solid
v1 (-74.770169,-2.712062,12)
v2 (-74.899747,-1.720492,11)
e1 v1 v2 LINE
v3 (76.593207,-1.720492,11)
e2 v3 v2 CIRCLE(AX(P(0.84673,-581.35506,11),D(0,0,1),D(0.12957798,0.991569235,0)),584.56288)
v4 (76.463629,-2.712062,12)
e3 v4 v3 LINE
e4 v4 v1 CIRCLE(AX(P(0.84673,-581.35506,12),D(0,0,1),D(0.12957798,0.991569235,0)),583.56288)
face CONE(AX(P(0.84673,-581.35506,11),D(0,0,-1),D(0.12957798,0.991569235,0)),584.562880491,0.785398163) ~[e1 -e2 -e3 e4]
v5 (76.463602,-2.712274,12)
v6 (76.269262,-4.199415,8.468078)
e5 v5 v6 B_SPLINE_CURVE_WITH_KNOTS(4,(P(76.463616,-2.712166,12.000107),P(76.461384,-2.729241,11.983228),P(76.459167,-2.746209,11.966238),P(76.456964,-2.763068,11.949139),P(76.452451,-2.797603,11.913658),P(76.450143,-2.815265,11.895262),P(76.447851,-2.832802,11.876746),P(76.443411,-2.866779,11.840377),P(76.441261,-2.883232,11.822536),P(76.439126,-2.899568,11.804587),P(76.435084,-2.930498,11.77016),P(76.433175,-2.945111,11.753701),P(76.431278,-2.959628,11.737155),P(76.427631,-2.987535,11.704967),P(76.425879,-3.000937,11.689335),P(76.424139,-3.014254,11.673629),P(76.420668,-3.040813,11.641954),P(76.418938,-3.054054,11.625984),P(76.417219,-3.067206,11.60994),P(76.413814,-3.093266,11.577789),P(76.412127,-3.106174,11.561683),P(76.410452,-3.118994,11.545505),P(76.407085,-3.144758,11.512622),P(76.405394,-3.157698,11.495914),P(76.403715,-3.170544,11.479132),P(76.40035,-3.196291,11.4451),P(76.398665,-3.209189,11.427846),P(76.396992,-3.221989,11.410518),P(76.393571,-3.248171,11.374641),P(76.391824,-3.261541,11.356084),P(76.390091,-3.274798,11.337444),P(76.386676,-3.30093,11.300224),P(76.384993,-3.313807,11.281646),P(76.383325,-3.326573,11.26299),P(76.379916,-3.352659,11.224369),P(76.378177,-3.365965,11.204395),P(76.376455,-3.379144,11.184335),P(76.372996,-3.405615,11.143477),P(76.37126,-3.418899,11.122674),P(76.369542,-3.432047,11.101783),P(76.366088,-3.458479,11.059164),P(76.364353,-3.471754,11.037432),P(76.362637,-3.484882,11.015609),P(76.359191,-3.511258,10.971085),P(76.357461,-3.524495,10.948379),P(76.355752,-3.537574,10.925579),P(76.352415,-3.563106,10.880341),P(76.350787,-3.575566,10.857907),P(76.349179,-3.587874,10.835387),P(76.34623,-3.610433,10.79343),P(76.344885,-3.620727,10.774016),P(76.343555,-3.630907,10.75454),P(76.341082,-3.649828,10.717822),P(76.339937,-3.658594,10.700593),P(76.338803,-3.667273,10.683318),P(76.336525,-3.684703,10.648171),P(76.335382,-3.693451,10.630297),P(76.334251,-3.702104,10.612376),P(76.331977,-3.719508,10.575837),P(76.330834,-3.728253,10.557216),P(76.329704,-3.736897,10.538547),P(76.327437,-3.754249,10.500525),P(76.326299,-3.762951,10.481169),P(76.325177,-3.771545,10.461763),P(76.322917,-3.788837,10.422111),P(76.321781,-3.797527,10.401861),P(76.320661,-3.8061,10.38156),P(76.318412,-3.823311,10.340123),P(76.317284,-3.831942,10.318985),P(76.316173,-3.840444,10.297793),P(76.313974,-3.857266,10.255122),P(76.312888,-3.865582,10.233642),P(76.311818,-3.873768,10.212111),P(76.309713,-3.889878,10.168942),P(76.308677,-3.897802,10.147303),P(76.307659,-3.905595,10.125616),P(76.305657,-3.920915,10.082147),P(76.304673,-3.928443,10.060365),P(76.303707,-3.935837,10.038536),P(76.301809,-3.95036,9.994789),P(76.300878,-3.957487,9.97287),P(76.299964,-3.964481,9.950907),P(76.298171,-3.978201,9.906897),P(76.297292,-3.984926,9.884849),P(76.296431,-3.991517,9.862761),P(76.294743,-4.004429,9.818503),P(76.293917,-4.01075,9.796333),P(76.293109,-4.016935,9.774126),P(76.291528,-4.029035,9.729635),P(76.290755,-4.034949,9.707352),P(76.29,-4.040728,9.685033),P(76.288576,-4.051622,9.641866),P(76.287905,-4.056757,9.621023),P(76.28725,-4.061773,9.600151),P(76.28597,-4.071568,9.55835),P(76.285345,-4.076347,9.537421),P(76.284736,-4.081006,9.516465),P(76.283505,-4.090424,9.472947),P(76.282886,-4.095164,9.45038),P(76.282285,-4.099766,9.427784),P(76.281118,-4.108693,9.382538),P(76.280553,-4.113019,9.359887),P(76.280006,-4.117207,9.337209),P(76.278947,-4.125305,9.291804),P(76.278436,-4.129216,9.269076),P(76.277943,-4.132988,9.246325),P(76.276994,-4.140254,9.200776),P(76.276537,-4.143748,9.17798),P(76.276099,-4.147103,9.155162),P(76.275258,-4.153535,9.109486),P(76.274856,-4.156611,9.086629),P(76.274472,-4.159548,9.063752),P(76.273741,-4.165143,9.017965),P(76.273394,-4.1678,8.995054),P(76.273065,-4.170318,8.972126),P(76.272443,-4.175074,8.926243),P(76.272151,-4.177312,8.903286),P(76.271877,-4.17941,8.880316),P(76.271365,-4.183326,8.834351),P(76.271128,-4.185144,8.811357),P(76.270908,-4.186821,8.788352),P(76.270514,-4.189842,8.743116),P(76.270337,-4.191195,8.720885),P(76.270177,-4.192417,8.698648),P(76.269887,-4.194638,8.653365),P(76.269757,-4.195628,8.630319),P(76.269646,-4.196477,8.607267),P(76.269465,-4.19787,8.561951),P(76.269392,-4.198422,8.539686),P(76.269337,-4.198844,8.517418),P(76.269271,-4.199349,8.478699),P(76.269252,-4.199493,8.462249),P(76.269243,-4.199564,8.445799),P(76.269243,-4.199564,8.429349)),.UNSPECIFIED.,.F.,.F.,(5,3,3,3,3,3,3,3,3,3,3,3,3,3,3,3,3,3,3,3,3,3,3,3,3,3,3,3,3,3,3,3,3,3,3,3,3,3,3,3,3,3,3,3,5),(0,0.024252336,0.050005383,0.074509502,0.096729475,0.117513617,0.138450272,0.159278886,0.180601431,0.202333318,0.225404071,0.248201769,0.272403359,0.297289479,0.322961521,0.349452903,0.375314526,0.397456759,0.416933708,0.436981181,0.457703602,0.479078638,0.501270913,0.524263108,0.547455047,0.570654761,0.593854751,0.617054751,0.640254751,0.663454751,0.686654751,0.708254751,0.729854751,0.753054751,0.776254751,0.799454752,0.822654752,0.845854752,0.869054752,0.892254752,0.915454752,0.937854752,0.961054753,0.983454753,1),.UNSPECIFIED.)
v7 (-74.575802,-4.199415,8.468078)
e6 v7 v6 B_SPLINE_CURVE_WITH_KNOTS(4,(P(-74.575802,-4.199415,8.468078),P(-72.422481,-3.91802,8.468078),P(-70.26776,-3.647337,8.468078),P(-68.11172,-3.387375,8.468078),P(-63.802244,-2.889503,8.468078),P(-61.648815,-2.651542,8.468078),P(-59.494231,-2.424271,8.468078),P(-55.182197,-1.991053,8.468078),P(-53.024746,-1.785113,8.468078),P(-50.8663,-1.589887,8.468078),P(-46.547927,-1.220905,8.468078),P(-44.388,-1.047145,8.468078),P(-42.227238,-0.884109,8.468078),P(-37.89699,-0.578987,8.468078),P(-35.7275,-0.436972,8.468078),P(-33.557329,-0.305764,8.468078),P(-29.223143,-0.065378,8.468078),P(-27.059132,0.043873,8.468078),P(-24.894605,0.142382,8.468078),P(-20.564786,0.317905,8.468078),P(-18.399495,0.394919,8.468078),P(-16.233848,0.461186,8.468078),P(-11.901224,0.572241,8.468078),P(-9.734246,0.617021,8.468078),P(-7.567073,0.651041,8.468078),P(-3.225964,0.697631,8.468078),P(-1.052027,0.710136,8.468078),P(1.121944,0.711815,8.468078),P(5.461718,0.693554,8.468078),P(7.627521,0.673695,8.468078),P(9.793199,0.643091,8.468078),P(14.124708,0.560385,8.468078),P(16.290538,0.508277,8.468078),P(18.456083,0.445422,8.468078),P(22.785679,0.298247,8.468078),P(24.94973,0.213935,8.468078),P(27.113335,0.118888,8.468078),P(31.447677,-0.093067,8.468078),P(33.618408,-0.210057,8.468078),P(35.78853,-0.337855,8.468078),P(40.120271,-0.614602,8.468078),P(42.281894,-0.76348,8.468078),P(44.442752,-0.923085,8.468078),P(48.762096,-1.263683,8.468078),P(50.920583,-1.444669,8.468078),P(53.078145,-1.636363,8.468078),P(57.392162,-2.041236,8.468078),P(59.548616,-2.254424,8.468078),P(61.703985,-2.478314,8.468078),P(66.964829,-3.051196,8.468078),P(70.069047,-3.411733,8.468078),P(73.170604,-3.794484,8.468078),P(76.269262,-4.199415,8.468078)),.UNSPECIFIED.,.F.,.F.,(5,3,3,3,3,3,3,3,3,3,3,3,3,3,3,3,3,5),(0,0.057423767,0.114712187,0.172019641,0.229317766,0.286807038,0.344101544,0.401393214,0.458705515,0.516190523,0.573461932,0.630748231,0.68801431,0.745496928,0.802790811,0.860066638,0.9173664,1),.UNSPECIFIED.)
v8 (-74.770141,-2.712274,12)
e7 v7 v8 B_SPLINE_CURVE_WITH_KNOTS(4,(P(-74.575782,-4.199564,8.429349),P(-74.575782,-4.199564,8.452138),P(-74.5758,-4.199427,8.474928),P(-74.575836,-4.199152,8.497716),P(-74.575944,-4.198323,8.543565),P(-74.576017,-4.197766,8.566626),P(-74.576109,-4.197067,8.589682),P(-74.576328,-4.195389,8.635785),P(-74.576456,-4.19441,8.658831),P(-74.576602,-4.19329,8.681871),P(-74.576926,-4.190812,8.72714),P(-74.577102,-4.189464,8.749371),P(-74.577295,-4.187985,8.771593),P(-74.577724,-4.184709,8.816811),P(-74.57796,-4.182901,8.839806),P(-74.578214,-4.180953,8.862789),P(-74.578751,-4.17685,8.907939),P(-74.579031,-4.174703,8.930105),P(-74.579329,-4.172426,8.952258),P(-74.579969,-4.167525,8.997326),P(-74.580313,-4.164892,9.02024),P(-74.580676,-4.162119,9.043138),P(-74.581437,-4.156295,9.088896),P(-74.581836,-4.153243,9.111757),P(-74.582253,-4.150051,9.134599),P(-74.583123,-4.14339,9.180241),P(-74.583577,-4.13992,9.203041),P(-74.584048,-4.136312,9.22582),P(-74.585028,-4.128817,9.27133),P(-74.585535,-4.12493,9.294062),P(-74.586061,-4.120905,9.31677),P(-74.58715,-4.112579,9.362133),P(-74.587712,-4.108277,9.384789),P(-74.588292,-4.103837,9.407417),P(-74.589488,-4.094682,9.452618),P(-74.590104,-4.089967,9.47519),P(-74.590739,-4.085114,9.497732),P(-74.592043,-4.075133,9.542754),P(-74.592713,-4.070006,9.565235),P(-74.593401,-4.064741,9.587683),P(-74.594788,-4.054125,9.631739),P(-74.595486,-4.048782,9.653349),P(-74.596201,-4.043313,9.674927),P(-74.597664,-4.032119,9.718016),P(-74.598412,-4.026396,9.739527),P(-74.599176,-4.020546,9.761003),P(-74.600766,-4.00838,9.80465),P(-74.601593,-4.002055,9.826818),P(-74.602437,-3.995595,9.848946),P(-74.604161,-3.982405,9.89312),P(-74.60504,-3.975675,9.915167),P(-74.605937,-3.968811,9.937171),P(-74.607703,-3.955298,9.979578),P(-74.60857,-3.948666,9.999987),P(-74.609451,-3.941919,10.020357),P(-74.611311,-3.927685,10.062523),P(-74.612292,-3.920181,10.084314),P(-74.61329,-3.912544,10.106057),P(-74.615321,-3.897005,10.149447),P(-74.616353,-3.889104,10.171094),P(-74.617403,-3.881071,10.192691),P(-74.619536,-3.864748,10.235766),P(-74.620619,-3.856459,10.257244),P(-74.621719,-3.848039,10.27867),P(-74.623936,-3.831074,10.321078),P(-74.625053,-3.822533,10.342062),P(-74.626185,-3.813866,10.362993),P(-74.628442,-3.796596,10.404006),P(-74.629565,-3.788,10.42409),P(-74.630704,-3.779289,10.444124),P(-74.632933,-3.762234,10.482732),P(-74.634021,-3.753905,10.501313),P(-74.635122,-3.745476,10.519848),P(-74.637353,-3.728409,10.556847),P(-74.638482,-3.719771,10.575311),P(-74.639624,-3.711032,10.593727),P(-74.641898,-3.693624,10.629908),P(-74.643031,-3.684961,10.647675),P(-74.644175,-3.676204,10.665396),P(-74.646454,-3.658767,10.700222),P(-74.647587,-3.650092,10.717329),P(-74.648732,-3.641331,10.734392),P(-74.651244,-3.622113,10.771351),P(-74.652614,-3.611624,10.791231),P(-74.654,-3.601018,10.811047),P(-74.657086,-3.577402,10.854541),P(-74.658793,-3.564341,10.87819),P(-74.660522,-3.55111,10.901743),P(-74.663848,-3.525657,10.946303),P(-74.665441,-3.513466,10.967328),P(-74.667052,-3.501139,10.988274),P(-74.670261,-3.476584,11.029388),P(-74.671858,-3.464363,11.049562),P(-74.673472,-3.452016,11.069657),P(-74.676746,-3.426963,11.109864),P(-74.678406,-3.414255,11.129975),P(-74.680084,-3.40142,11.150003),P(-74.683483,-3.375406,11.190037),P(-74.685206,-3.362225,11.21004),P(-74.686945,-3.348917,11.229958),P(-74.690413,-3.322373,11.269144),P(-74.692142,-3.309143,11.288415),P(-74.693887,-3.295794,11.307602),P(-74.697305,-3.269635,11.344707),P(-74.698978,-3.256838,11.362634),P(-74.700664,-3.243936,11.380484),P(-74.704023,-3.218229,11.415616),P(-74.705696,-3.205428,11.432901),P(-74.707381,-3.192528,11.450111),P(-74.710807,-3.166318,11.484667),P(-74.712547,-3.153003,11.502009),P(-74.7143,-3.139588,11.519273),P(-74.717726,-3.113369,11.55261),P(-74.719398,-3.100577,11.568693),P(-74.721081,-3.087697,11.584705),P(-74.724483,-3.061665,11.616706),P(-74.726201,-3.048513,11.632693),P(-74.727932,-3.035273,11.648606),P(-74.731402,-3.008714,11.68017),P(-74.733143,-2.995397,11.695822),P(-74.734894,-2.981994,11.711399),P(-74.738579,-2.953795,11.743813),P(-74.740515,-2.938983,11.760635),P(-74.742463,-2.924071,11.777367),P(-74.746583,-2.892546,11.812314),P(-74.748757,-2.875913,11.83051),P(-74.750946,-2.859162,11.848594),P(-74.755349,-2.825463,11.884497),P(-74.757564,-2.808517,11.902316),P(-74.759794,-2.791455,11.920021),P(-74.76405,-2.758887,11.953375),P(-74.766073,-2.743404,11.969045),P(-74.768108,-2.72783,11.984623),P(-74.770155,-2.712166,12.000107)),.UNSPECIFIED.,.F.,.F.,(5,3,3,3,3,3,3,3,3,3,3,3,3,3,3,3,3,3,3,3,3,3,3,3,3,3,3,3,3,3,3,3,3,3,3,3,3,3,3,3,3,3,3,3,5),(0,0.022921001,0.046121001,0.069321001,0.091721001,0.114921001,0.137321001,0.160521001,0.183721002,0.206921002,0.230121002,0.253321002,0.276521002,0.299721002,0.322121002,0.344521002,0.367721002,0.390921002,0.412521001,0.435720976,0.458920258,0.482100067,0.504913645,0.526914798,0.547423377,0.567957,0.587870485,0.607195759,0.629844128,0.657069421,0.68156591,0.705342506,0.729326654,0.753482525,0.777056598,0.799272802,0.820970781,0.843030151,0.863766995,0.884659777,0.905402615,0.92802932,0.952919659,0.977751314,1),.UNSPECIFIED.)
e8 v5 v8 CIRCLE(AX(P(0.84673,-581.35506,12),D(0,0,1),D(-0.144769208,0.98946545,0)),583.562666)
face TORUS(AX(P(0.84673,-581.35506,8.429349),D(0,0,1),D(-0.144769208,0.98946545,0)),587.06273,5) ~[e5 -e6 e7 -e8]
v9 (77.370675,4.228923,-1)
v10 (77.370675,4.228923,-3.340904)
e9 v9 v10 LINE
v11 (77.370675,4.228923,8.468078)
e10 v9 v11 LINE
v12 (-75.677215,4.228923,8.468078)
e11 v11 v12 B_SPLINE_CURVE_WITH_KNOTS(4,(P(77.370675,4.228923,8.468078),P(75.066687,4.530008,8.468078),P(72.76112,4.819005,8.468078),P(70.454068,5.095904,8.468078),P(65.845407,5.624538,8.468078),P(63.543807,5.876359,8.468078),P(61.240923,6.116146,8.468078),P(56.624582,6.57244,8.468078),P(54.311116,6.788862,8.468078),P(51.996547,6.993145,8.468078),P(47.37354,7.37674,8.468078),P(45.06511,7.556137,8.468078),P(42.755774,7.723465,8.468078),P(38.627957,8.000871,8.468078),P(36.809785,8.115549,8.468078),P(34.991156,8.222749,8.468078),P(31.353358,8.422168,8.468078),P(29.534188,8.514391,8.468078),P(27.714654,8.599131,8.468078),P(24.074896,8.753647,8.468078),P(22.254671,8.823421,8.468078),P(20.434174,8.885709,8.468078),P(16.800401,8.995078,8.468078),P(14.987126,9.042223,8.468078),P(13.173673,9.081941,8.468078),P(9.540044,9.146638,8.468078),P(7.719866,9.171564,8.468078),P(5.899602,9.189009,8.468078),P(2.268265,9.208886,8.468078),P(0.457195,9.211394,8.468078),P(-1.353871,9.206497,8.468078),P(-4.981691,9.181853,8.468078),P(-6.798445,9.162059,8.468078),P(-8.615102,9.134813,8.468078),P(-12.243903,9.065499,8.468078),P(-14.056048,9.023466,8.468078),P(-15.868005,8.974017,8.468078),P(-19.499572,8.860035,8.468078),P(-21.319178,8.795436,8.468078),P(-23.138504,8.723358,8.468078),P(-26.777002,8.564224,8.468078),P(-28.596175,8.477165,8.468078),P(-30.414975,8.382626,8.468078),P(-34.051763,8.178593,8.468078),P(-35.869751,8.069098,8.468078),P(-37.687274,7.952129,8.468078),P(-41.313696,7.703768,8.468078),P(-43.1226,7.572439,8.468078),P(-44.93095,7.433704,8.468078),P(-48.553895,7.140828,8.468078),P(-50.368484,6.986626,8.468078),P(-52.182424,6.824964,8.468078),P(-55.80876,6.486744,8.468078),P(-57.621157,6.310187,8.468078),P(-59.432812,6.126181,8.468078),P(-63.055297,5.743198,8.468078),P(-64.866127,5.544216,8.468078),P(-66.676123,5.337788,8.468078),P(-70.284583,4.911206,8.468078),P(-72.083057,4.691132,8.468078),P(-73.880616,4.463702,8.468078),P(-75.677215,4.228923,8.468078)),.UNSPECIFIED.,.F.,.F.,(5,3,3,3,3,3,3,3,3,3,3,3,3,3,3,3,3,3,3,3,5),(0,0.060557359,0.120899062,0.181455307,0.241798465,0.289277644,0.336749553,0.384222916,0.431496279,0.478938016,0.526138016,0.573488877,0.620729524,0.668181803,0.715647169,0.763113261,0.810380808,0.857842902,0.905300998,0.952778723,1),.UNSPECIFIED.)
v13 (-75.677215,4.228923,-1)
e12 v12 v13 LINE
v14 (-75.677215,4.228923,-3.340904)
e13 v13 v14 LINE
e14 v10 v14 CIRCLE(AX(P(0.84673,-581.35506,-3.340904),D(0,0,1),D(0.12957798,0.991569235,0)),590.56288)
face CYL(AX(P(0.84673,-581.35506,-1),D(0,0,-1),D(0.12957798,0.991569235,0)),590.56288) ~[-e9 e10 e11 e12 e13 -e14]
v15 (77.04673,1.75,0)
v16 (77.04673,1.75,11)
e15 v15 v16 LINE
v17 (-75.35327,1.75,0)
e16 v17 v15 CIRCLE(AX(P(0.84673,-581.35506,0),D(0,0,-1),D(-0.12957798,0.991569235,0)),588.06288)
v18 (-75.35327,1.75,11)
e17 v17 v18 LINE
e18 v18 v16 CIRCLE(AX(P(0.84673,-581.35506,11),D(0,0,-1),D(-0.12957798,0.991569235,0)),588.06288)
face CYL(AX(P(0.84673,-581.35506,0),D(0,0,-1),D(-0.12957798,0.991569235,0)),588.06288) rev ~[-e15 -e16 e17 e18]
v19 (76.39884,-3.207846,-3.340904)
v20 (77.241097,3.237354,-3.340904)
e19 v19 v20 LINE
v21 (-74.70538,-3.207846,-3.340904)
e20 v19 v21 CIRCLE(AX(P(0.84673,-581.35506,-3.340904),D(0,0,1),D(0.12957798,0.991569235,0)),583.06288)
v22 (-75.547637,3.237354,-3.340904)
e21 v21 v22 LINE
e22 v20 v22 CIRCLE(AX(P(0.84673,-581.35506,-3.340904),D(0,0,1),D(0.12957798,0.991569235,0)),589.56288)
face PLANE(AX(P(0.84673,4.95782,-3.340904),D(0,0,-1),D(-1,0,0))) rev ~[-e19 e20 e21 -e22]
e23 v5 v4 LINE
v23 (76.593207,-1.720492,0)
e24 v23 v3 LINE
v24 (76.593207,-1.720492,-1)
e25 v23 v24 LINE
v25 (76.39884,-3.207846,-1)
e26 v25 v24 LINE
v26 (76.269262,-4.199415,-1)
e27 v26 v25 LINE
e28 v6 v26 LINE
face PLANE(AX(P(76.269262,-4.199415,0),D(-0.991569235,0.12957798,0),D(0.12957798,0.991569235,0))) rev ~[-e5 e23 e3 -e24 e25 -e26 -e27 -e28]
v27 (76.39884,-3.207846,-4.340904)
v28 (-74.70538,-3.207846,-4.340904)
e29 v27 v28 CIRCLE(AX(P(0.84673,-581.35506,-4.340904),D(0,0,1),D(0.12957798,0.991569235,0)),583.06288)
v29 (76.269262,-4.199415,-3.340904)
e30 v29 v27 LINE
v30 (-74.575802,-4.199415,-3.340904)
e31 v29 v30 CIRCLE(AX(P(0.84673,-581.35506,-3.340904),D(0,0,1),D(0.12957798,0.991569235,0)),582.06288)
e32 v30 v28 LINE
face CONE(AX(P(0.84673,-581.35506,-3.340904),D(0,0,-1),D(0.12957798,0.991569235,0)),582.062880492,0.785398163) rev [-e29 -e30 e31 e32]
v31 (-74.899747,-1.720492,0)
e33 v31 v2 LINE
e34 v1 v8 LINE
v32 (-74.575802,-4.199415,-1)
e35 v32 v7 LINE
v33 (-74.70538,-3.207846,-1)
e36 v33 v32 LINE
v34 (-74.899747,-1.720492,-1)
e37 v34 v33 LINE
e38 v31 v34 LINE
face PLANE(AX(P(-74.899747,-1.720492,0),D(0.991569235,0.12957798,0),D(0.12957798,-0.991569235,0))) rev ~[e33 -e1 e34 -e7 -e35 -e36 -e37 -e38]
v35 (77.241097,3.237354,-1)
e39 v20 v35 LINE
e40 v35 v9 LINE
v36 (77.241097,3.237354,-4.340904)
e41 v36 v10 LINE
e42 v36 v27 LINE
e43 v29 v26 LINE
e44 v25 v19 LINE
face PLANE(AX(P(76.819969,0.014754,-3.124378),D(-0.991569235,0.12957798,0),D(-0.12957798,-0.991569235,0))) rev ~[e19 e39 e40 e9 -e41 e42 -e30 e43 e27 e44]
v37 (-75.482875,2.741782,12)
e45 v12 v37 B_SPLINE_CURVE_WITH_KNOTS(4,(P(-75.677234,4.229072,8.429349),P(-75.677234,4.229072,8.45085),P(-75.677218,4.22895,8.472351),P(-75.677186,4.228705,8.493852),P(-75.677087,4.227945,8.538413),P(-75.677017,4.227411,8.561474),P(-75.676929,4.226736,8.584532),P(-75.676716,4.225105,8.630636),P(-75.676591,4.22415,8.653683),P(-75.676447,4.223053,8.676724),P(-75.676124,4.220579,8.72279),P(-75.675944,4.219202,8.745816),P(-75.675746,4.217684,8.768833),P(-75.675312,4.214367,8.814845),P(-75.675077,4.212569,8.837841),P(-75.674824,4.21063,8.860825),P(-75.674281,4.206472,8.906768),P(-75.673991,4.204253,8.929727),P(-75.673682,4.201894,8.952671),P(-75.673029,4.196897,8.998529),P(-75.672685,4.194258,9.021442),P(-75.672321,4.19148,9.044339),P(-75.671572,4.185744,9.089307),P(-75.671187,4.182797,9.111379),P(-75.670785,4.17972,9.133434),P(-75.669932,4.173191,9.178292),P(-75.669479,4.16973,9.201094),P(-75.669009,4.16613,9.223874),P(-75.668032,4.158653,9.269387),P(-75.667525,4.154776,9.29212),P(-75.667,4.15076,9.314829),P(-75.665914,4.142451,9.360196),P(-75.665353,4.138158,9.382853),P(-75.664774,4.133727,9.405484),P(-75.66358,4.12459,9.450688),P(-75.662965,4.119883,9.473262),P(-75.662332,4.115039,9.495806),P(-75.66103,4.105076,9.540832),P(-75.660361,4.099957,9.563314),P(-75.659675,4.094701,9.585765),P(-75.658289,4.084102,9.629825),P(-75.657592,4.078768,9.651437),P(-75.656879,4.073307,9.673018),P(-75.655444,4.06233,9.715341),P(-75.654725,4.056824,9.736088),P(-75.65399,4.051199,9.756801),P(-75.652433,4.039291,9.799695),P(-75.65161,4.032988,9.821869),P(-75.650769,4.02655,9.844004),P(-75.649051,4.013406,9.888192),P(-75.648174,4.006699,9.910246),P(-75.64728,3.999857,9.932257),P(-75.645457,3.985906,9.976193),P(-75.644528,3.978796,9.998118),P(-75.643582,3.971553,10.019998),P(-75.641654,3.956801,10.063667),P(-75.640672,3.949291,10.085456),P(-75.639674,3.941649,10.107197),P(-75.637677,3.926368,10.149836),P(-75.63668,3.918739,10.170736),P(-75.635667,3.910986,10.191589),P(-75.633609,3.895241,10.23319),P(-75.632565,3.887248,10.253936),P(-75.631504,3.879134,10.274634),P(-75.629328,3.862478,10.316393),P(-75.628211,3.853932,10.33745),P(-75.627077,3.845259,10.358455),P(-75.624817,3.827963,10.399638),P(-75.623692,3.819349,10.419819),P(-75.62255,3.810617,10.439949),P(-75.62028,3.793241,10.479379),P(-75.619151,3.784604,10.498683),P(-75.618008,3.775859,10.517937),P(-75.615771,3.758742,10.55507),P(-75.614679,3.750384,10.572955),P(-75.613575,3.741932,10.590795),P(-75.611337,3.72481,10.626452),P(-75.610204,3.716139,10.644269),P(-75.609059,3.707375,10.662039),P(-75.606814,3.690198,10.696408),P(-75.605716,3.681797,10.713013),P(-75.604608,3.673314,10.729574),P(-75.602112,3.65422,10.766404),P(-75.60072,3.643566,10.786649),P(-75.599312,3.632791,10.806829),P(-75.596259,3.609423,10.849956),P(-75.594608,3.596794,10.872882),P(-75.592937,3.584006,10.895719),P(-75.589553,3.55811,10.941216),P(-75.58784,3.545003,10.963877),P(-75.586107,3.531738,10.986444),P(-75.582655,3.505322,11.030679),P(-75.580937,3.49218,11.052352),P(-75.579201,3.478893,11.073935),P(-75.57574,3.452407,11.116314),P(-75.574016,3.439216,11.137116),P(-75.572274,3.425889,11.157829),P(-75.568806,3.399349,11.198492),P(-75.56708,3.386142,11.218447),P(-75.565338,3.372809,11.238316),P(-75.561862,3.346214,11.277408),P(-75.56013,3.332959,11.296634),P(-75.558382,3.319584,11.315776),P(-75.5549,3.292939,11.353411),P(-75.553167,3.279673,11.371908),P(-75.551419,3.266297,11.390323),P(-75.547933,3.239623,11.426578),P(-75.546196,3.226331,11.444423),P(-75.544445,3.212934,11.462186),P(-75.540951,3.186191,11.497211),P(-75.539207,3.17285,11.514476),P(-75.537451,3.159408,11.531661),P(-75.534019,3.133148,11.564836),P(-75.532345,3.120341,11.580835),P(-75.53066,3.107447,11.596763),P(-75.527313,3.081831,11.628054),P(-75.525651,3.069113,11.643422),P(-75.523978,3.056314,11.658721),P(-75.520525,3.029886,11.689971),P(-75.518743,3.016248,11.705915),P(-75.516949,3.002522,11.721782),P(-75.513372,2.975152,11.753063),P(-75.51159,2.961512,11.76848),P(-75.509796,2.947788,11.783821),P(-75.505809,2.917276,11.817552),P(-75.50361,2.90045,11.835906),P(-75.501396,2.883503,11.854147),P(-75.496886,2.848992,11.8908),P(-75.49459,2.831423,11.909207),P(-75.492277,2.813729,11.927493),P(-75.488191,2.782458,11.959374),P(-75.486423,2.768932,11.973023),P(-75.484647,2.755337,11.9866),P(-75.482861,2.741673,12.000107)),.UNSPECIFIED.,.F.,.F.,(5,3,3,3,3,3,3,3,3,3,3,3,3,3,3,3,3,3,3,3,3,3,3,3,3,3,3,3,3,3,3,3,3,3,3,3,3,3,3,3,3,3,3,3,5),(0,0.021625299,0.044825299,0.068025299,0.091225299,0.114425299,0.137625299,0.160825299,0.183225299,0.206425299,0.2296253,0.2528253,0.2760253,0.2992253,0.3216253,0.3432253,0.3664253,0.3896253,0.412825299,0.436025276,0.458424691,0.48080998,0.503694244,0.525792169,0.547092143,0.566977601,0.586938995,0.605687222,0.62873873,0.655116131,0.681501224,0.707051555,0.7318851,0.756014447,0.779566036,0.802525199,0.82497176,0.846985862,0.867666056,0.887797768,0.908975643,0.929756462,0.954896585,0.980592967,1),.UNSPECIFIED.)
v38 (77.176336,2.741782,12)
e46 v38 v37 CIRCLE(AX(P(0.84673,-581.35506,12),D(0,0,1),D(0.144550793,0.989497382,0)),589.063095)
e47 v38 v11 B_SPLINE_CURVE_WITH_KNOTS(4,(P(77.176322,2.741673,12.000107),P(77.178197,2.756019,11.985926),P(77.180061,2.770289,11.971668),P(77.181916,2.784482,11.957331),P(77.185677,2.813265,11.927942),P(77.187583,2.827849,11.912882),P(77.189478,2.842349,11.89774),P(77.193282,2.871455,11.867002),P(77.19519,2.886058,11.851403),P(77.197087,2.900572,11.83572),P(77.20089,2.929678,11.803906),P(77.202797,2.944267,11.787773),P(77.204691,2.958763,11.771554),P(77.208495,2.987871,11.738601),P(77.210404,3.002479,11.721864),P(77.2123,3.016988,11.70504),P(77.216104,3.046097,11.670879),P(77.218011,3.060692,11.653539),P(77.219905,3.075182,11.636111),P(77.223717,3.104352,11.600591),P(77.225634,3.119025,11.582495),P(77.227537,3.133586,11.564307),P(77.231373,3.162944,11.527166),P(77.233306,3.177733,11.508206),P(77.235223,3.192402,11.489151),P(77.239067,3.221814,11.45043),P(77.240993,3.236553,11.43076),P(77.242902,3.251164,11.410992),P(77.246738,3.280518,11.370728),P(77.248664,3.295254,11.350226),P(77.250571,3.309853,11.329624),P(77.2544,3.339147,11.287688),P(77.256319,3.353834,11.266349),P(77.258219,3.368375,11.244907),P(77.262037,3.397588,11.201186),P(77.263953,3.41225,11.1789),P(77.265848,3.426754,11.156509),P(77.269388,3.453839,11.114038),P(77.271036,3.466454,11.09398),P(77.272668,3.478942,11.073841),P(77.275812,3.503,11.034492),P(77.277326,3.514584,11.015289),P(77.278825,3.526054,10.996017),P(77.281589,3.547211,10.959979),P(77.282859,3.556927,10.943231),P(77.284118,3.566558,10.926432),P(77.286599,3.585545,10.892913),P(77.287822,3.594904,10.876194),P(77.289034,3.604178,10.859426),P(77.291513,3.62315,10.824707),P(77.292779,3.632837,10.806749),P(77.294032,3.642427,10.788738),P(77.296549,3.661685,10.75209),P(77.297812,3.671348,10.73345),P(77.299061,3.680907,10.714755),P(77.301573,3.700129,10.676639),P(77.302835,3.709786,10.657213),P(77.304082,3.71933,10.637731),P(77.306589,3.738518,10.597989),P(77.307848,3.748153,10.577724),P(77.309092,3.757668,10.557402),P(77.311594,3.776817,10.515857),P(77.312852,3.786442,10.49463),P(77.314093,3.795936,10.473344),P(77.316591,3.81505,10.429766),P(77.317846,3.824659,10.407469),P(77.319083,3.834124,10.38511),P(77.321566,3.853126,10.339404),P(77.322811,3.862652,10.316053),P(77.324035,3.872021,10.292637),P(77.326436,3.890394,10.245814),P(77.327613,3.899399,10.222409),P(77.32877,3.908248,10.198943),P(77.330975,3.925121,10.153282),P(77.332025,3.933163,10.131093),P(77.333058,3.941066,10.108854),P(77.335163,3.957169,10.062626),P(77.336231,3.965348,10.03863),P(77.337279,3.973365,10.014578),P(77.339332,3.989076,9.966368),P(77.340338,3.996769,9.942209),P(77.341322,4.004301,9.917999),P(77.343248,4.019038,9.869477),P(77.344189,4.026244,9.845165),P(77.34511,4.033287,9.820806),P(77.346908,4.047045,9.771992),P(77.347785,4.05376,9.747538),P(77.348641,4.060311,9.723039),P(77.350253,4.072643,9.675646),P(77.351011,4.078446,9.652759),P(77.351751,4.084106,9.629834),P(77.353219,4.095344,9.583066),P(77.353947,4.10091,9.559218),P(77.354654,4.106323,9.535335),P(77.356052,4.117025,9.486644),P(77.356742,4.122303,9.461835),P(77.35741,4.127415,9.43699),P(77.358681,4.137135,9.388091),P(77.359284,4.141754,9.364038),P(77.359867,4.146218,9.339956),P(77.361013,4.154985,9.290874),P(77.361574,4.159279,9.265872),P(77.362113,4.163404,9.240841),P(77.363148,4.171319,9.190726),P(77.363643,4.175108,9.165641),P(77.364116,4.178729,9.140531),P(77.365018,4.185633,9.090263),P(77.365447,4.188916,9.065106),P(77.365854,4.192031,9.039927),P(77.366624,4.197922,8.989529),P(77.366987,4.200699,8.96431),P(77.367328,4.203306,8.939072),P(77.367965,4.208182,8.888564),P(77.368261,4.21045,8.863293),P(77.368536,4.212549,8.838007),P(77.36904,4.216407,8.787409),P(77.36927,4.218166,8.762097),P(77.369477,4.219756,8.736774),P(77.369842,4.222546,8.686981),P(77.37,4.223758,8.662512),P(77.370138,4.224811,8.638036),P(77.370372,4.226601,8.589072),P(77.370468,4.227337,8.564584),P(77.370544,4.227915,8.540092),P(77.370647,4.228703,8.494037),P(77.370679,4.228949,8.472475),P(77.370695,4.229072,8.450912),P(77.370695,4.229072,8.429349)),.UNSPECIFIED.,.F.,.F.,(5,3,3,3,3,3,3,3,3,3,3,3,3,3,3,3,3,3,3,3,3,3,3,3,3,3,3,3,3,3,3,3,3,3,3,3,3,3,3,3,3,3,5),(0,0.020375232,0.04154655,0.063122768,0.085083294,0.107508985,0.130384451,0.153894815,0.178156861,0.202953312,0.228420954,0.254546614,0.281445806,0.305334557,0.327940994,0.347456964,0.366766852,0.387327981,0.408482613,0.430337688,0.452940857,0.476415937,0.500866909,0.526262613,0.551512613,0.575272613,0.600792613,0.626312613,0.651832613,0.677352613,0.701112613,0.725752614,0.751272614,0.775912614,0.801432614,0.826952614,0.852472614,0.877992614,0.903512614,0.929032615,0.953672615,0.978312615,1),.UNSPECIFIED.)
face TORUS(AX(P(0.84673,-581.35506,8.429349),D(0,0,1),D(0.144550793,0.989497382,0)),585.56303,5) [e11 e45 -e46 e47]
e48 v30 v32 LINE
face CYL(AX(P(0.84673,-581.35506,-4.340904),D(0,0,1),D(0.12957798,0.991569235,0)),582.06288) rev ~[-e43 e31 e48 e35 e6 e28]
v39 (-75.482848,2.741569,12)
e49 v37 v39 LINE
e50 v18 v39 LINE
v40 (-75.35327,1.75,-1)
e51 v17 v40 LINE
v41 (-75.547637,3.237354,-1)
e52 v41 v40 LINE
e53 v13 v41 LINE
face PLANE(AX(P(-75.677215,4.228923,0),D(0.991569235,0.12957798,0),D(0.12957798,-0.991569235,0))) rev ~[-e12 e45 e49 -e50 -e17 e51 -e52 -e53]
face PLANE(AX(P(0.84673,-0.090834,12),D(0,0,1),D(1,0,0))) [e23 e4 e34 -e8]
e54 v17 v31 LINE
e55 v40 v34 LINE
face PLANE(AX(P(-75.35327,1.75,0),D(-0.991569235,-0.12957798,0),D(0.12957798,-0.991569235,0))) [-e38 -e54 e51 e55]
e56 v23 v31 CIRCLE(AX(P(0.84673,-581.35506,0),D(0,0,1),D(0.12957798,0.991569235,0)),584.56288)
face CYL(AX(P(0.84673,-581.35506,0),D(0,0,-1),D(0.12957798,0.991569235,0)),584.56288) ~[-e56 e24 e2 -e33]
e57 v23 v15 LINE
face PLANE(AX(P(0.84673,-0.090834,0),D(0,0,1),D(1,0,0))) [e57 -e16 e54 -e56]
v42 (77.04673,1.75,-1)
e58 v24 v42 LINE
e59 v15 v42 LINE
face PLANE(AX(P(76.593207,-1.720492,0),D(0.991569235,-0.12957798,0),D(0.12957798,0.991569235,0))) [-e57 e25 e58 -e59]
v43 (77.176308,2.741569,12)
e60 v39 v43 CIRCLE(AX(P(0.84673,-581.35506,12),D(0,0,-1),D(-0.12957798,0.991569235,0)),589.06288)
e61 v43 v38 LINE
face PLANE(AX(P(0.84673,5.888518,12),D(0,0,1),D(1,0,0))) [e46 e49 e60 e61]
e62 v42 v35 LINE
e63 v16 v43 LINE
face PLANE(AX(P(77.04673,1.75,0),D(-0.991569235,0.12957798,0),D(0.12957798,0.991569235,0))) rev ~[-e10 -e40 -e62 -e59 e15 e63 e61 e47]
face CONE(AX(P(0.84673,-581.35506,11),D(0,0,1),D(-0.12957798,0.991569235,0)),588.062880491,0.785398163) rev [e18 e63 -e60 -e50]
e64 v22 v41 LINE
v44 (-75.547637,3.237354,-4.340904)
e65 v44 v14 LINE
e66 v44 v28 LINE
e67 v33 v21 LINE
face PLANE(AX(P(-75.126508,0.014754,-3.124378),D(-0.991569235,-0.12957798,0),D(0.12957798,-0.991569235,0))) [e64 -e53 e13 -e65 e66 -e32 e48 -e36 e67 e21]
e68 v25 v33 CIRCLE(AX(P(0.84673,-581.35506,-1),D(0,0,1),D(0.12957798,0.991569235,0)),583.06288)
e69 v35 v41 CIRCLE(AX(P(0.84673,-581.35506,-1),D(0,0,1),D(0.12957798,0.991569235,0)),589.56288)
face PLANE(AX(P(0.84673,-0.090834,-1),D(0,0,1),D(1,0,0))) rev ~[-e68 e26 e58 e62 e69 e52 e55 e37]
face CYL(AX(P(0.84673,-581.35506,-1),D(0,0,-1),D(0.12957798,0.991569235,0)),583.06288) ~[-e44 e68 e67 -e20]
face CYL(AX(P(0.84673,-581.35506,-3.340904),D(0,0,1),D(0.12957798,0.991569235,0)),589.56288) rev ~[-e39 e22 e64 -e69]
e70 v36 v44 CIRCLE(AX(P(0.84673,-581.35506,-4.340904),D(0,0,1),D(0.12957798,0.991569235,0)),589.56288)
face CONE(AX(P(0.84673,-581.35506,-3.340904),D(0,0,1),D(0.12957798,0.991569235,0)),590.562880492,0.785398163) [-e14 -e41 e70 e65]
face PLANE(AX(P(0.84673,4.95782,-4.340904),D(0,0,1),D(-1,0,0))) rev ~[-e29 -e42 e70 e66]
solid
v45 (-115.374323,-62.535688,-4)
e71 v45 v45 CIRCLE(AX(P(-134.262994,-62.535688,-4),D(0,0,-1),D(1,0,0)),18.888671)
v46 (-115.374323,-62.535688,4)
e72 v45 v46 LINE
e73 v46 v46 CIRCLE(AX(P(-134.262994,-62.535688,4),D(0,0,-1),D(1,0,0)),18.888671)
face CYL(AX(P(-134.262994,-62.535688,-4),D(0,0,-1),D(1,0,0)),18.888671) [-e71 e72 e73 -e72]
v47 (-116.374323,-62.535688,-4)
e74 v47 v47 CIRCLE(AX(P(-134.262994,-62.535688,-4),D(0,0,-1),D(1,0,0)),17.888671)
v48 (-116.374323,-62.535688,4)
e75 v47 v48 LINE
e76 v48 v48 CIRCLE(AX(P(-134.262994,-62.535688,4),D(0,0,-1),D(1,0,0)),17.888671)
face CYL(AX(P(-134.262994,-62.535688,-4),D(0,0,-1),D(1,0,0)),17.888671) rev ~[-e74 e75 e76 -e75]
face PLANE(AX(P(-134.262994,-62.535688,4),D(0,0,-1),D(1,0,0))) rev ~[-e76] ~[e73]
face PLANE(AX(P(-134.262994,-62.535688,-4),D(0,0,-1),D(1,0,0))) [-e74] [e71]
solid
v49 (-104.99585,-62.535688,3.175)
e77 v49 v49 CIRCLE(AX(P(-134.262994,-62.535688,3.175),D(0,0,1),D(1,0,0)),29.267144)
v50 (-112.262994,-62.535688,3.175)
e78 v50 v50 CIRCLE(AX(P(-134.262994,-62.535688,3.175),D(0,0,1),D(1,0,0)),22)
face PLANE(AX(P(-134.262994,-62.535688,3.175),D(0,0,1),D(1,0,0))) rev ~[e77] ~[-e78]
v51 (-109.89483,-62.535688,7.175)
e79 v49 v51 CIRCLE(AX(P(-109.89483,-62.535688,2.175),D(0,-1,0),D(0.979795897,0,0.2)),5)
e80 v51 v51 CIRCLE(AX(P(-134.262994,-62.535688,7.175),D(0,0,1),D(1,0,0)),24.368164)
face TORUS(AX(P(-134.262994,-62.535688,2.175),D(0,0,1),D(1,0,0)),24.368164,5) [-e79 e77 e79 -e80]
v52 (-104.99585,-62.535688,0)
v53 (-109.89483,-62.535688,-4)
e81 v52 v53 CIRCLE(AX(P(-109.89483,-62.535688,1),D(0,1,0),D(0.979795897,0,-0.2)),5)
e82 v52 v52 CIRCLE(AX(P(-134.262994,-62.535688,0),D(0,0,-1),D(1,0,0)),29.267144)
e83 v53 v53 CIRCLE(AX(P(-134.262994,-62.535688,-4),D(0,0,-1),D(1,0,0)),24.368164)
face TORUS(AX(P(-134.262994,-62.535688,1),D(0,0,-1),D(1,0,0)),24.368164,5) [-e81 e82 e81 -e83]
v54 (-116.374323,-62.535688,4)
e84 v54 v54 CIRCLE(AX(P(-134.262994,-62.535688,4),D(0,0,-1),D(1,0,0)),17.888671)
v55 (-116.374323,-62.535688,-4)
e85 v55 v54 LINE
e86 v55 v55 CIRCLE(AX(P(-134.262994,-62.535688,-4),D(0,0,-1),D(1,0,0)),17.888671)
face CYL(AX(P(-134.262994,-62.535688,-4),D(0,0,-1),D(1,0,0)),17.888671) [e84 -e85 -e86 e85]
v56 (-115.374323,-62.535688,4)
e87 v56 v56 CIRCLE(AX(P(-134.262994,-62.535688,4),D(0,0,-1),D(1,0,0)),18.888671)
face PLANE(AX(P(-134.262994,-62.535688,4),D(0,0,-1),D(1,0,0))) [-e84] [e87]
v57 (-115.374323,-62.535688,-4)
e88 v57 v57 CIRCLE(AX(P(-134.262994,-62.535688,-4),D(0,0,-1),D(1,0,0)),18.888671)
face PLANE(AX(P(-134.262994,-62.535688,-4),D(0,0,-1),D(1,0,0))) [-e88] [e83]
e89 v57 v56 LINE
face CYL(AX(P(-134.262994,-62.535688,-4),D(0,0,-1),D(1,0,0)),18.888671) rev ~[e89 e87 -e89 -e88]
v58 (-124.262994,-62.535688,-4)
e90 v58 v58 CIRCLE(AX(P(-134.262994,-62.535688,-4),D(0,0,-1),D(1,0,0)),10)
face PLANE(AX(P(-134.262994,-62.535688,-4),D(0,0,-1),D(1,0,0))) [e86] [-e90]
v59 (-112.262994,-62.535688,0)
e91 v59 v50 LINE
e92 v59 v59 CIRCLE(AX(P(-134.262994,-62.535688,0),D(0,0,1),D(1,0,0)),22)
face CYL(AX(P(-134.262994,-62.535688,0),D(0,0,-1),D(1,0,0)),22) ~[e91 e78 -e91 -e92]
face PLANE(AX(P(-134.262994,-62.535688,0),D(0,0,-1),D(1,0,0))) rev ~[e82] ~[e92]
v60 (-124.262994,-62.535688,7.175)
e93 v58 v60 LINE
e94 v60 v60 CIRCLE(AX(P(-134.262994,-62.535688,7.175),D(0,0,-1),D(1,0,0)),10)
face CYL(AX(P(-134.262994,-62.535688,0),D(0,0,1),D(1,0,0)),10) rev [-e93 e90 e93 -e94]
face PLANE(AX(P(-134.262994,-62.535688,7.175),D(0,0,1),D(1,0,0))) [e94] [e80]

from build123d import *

# Parameters (mm, degrees)
F1_DEPTH    = 1
F4_DEPTH    = 1
F6_DEPTH    = 12
F7_SIZE     = 1
F8_T2_ANGLE = 16.6478295889
F8_T4_ANGLE = 16.6225349948
F11_SIZE    = 1
F12_R       = 22
F12_R_2     = 10
F13_DEPTH   = 3.175
F14_R       = 29.2671438264
F15_DEPTH   = 4
F17_DEPTH   = 25
F18_R       = 29.2671438264
F18_R_2     = 10
F19_DEPTH   = 4
F21_R       = 18.8886705246
F21_R_2     = 17.8886705246
F22_DEPTH   = 8


# Not quite as in the source:
# - a fillet or chamfer that OpenCascade refuses, or shapes differently, is made with other operations: its cross-section is extruded or revolved along the edge and cut away or added


with BuildPart() as f1:
    # F0 (on Top) → F1 (new body)
    with BuildSketch(Plane.XY):
        Polygon((76.2, -1.75), (76.2, 1.75), (76.2, 6.1025535688), (-76.2, 6.1025535688), (-76.2, 1.75), (-76.2, -1.75), (-76.2, -6.1025535688), (76.2, -6.1025535688), align=None)
    extrude(amount=-F1_DEPTH)


with BuildPart() as f4:
    # F3 (on Top) → F4 (new body)
    with BuildSketch(Plane.XY):
        with BuildLine():
            Line((76.2692624922, -4.1994154081), (76.5932074415, -1.7204923214))
            ThreePointArc((76.5932074415, -1.7204923214), (0.8467303705, 3.2078201362), (-74.8997467005, -1.7204923214))
            Line((-74.8997467005, -1.7204923214), (-74.5758017512, -4.1994154081))
            ThreePointArc((-74.5758017512, -4.1994154081), (0.8467303705, 0.7078201362), (76.2692624922, -4.1994154081))
        make_face()
        with BuildLine():
            Line((76.5932074415, -1.7204923214), (77.0467303705, 1.75))
            ThreePointArc((77.0467303705, 1.75), (0.8467303705, 6.7078201362), (-75.3532696295, 1.75))
            Line((-75.3532696295, 1.75), (-74.8997467005, -1.7204923214))
            ThreePointArc((-74.8997467005, -1.7204923214), (0.8467303705, 3.2078201362), (76.5932074415, -1.7204923214))
        make_face()
        with BuildLine():
            ThreePointArc((-75.3532696295, 1.75), (0.8467303705, 6.7078201362), (77.0467303705, 1.75))
            Line((77.0467303705, 1.75), (77.3706753198, 4.2289230867))
            ThreePointArc((77.3706753198, 4.2289230867), (0.8467303705, 9.2078201362), (-75.6772145787, 4.2289230867))
            Line((-75.6772145787, 4.2289230867), (-75.3532696295, 1.75))
        make_face()
    extrude(amount=-F4_DEPTH)

    # F5 (on face) → F6 (join)
    with BuildSketch(Plane.XY):
        with BuildLine():
            ThreePointArc((-75.3532696295, 1.75), (0.8467303705, 6.7078201362), (77.0467303705, 1.75))
            Line((77.0467303705, 1.75), (77.3706753198, 4.2289230867))
            ThreePointArc((77.3706753198, 4.2289230867), (0.8467303705, 9.2078201362), (-75.6772145787, 4.2289230867))
            Line((-75.6772145787, 4.2289230867), (-75.3532696295, 1.75))
        make_face()
        with BuildLine():
            Line((76.2692624922, -4.1994154081), (76.5932074415, -1.7204923214))
            ThreePointArc((76.5932074415, -1.7204923214), (0.8467303705, 3.2078201362), (-74.8997467005, -1.7204923214))
            Line((-74.8997467005, -1.7204923214), (-74.5758017512, -4.1994154081))
            ThreePointArc((-74.5758017512, -4.1994154081), (0.8467303705, 0.7078201362), (76.2692624922, -4.1994154081))
        make_face()
    extrude(amount=F6_DEPTH)

    # F7
    f7_edges = [f4.edges().sort_by_distance(p)[0] for p in [
        (0.84673, 6.70782, 12),
        (0.84673, 3.20782, 12),
    ]]
    chamfer(f7_edges, length=F7_SIZE)

    # F8: fillet of radius 5 on 2 edges, made by hand

    # F8_s1 → F8_t2 (revolve, cut)
    with BuildSketch(Plane(origin=(-82.446715332, -12.0628221249, 0), x_dir=(0, 0, 1), z_dir=(-0.9894654498, -0.1447692085, 0))):
        with BuildLine():
            ThreePointArc((12.0001071227, 8.2094487393), (10.36586952, 7.099643712), (8.4293487989, 6.709403738))
            Line((8.4293487989, 6.709403738), (8.4293487989, 6.609403738))
            ThreePointArc((8.4293487989, 6.609403738), (10.2146743994, 6.609553738), (12, 6.609553738))
            Line((12, 6.609553738), (12.1, 6.709553738))
            ThreePointArc((12.1, 6.709553738), (12.1, 7.4595012386), (12.0715222892, 8.1394496393))
            Line((12.0715222892, 8.1394496393), (12.0001071227, 8.2094487393))
        make_face()
    revolve(axis=Axis((0.8467303705, -581.3550603549, 12), (0, 0, -1)), revolution_arc=F8_T2_ANGLE, mode=Mode.SUBTRACT)

    # F8_s3 → F8_t4 (revolve, cut)
    with BuildSketch(Plane(origin=(83.9817821189, -12.2684844413, 0), x_dir=(0, 0, 1), z_dir=(0.9894973816, -0.1445507933, 0))):
        with BuildLine():
            ThreePointArc((8.4293487989, -15.4361160503), (10.36586952, -15.0458760762), (12.0001071227, -13.9360710489))
            Line((12.0001071227, -13.9360710489), (12.0715222892, -14.0060701489))
            ThreePointArc((12.0715222892, -14.0060701489), (12.1, -14.6860185496), (12.1, -15.4359660503))
            Line((12.1, -15.4359660503), (12, -15.5359660503))
            ThreePointArc((12, -15.5359660503), (10.2146743994, -15.5359660503), (8.4293487989, -15.5361160503))
            Line((8.4293487989, -15.5361160503), (8.4293487989, -15.4361160503))
        make_face()
    revolve(axis=Axis((0.8467303705, -581.3550603549, 12), (0, 0, 1)), revolution_arc=F8_T4_ANGLE, mode=Mode.SUBTRACT)

    # F10: sweep along a path in F10_path
    with BuildLine(Plane(origin=(76.2692624922, -4.1994154081, -1), x_dir=(0, -1, 0), z_dir=(0, 0, -1))) as f10_path:
        ThreePointArc((0, 0), (-4.9072355443, 75.4225321217), (0, 150.8450642434))
    # F9 (on face) → F10 (sweep)
    with BuildSketch(Plane(origin=(-73.8632044186, -9.6524221094, 0), x_dir=(0.1295779797, -0.9915692347, 0), z_dir=(-0.9915692347, -0.1295779797, 0))):
        Polygon((-5.4993706043, -4.3409038335), (-5.4993706043, -1), (-6.4993706043, -1), (-6.4993706043, -3.3409038335), (-12.9993706043, -3.3409038335), (-12.9993706043, -1), (-13.9993706043, -1), (-13.9993706043, -4.3409038335), align=None)
    sweep(path=f10_path.line)

    # F11
    f11_edges = [f4.edges().sort_by_distance(p)[0] for p in [
        (0.84673, 0.70782, -4.340904),
        (0.84673, 9.20782, -4.340904),
    ]]
    chamfer(f11_edges, length=F11_SIZE)


with BuildPart() as f13:
    # F12 (on Top) → F13 (new body)
    with BuildSketch(Plane.XY):
        with Locations((-134.2629939318, -62.5356882811)):
            Circle(F12_R)
        with Locations((-134.2629939318, -62.5356882811)):
            Circle(F12_R_2, mode=Mode.SUBTRACT)
    extrude(amount=F13_DEPTH)

    # F14 (on face) → F15 (join)
    with BuildSketch(Plane.XY.offset(3.175)):
        with Locations((-134.2629939318, -62.5356882811)):
            Circle(F14_R)
    extrude(amount=F15_DEPTH)

    # F16: fillet of radius 5 on 1 edges, made by hand

    # F16_s1 → F16_t2 (revolve, cut)
    with BuildSketch(Plane.XZ.offset(62.5356882811)):
        with BuildLine():
            ThreePointArc((-104.9958501054, 3.175), (-106.7325519308, 6.0479833462), (-109.894829591, 7.175))
            Line((-109.894829591, 7.175), (-104.9958501054, 7.175))
            Line((-104.9958501054, 7.175), (-104.9958501054, 3.175))
        make_face()
    revolve(axis=Axis((-134.2629939318, -62.5356882811, 7.175), (0, 0, 1)), mode=Mode.SUBTRACT)

    # F17 (cut): a face of the model
    f17_faces = [f13.faces().sort_by_distance(p)[0] for p in [
        (-134.2629939318, -62.5356882811, 3.175),
    ]]
    extrude(f17_faces, amount=-F17_DEPTH, mode=Mode.SUBTRACT)

    # F18 (on face) → F19 (join)
    with BuildSketch(Plane(origin=(0, 0, 0), x_dir=(1, 0, 0), z_dir=(0, 0, -1))):
        with Locations((-134.2629939318, 62.5356882811)):
            Circle(F18_R)
        with Locations((-134.2629939318, 62.5356882811)):
            Circle(F18_R_2, mode=Mode.SUBTRACT)
    extrude(amount=F19_DEPTH)

    # F20: fillet of radius 5 on 1 edges, made by hand

    # F20_s1 → F20_t2 (revolve, cut)
    with BuildSketch(Plane.XZ.offset(62.5356882811)):
        with BuildLine():
            ThreePointArc((-104.9958501054, 0), (-106.7325519308, -2.8729833462), (-109.894829591, -4))
            Line((-109.894829591, -4), (-104.9958501054, -4))
            Line((-104.9958501054, -4), (-104.9958501054, 0))
        make_face()
    revolve(axis=Axis((-134.2629939318, -62.5356882811, -4), (0, 0, -1)), mode=Mode.SUBTRACT)


with BuildPart() as f22:
    # F21 (on face) → F22 (new body)
    with BuildSketch(Plane(origin=(0, 0, -4), x_dir=(1, 0, 0), z_dir=(0, 0, -1))):
        with Locations((-134.2629939318, 62.5356882811)):
            Circle(F21_R)
        with Locations((-134.2629939318, 62.5356882811)):
            Circle(F21_R_2, mode=Mode.SUBTRACT)
    extrude(amount=-F22_DEPTH)


with BuildPart() as f13_1:
    add(f13.part)

    # F23: cut F22
    add(f22.part, mode=Mode.SUBTRACT)


solid = Compound([f4.part, f22.part, f13_1.part])
